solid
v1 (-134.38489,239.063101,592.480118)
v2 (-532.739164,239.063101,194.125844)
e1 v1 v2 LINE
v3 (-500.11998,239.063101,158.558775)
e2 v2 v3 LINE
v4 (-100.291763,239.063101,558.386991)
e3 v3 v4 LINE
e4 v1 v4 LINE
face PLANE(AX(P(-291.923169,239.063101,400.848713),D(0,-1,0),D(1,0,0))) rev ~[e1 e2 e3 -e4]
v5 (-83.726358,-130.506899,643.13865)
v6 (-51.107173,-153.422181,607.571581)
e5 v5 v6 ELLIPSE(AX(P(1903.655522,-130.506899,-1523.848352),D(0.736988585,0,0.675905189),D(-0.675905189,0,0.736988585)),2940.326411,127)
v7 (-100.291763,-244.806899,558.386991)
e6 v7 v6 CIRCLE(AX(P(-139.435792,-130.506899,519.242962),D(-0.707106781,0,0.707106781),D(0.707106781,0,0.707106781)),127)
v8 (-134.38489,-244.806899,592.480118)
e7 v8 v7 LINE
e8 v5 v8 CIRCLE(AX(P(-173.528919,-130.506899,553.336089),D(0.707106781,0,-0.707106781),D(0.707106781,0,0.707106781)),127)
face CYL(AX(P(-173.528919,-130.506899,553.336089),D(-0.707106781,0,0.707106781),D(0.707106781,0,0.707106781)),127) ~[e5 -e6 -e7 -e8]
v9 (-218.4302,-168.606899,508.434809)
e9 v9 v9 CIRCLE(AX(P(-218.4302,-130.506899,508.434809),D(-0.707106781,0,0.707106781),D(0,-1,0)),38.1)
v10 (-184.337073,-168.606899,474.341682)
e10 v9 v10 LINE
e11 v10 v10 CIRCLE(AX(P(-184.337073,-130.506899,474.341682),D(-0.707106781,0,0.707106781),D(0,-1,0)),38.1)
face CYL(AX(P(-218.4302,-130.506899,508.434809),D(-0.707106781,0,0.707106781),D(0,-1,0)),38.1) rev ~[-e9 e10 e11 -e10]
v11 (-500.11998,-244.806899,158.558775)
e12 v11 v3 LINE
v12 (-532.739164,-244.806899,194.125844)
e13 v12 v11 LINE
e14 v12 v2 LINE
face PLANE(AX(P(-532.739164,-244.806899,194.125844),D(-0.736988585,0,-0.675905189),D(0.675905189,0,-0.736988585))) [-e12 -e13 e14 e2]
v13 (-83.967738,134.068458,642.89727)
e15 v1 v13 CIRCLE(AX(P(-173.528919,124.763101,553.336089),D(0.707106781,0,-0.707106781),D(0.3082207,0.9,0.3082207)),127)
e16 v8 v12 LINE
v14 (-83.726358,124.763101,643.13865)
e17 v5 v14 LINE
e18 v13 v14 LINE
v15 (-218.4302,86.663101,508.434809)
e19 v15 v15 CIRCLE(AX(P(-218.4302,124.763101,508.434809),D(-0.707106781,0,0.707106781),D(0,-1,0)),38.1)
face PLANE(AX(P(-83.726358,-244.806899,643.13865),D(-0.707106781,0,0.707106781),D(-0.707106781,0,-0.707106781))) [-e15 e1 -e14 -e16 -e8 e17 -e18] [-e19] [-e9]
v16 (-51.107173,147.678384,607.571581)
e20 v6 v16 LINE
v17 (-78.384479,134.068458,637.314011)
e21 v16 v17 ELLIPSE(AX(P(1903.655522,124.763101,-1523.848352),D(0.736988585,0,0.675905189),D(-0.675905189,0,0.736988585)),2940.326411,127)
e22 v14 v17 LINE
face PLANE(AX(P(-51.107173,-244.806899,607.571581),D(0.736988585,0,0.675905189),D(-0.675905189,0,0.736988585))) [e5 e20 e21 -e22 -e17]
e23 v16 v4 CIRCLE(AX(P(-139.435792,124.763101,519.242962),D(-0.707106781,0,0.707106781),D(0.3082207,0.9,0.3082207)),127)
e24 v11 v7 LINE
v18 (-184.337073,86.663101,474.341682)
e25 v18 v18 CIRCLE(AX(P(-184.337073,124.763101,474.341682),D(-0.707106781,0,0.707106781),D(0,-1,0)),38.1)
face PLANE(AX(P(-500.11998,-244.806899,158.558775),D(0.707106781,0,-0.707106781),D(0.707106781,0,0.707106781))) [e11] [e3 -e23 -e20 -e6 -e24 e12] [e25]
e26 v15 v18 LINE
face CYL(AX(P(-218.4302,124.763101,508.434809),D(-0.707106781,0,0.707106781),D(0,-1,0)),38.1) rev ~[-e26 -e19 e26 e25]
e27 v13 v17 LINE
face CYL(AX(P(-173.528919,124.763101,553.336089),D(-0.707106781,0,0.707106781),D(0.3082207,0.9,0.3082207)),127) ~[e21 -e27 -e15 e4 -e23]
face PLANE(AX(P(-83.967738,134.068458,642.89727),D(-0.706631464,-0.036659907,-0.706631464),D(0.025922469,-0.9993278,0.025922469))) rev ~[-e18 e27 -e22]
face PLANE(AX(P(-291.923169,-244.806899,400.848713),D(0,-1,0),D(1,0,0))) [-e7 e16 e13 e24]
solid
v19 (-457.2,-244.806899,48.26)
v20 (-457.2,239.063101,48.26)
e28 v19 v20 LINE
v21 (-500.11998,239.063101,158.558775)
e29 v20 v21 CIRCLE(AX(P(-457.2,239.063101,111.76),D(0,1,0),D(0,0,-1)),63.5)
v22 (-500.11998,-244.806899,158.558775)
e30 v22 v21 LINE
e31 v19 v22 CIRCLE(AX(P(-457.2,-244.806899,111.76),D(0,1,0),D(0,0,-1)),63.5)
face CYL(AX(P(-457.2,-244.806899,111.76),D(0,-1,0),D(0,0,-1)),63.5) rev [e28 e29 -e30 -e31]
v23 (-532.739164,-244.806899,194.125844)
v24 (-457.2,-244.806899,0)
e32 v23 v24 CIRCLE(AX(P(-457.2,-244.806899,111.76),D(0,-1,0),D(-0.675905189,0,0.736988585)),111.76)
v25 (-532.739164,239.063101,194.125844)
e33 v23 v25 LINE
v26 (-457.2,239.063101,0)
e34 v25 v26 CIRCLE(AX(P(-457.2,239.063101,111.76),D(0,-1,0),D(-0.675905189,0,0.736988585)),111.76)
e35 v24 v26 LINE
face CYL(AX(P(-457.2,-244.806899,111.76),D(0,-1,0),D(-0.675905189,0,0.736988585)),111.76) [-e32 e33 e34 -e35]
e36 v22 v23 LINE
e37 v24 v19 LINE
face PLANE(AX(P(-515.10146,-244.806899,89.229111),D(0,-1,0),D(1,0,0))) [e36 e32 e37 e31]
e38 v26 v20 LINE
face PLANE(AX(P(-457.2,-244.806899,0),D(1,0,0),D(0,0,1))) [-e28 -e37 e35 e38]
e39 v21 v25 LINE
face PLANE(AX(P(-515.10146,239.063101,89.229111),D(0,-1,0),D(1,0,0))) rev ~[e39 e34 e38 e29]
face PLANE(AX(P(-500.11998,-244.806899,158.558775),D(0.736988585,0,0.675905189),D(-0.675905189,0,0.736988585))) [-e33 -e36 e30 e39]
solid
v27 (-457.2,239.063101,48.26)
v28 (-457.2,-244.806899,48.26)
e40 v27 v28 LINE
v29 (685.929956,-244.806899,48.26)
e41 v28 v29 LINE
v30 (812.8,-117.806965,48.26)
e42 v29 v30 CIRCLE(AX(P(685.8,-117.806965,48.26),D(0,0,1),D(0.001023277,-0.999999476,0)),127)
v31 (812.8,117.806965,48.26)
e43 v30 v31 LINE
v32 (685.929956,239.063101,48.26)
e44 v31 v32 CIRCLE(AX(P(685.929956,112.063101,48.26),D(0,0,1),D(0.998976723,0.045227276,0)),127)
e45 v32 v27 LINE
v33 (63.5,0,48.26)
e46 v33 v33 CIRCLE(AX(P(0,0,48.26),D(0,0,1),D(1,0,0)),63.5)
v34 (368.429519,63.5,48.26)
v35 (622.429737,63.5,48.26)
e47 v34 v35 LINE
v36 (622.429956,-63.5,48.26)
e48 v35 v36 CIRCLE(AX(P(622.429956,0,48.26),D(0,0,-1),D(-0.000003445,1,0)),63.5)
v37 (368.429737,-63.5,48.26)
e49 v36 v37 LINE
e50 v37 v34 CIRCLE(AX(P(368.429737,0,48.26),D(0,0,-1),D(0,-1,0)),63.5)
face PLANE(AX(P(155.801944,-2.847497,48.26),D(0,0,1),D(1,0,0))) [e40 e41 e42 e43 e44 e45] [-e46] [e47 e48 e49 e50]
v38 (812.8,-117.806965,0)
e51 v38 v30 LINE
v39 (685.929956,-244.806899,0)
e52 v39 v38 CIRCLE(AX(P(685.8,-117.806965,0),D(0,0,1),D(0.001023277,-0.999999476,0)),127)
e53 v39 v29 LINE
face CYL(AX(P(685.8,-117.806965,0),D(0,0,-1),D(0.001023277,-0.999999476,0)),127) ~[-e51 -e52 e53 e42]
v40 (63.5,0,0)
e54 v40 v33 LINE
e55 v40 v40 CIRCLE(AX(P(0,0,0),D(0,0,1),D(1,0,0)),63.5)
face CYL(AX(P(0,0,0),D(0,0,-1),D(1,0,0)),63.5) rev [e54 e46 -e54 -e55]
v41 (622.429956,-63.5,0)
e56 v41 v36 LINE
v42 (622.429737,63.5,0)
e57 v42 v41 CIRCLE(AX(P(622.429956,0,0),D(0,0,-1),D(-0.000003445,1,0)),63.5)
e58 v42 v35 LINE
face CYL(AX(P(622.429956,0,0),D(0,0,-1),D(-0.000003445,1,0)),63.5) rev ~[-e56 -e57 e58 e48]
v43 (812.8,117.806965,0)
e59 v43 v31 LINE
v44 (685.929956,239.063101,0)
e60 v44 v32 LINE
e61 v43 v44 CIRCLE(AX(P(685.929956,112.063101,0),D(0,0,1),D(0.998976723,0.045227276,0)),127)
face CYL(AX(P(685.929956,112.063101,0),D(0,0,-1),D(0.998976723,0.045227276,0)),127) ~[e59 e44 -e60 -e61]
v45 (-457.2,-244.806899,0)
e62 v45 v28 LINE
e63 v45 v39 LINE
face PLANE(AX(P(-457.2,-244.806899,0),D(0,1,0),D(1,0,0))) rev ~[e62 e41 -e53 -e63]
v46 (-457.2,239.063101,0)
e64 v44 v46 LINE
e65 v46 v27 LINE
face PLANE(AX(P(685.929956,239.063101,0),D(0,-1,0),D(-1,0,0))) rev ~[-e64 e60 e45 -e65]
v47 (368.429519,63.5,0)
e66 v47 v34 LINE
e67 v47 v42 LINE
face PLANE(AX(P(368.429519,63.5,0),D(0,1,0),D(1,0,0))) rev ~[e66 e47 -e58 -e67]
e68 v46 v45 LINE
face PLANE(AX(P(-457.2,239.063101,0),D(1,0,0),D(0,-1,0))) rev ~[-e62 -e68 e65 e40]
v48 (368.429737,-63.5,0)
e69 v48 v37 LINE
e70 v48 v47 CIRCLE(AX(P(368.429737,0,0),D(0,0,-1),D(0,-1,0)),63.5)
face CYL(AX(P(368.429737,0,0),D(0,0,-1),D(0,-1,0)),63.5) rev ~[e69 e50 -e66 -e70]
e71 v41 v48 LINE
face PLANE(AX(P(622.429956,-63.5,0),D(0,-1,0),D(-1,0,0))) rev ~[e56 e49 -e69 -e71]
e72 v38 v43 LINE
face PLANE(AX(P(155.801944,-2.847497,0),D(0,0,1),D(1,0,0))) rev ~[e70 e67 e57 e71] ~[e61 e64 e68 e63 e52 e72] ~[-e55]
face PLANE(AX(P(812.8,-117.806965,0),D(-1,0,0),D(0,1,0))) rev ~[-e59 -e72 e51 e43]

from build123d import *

# Parameters (mm, degrees)
F0_R     = 63.5
F1_DEPTH = 48.26
F3_DEPTH = 483.87
F6_DEPTH = 483.87
F7_R     = 38.1
F8_DEPTH = 48.26


# Not quite as in the source:
# - a feature of the source that left no trace in its solid (it failed there, or was rolled back) is left out


with BuildPart() as f1:
    # F0 (on Top) → F1 (new body)
    with BuildSketch(Plane.XY):
        with BuildLine():
            Line((685.9299561556, 239.0631011906), (-457.2, 239.0631011906))
            Line((-457.2, 239.0631011906), (-457.2, -244.8068988094))
            Line((-457.2, -244.8068988094), (685.9299561556, -244.8068988094))
            ThreePointArc((685.9299561556, -244.8068988094), (775.6484959021, -207.5635683113), (812.8, -117.8069653))
            Line((812.8, -117.8069653), (812.8, 117.8069653))
            ThreePointArc((812.8, 117.8069653), (773.6782588688, 203.8739685808), (685.9299561556, 239.0631011906))
        make_face()
        Circle(F0_R, mode=Mode.SUBTRACT)
        with BuildLine():
            ThreePointArc((368.4297373828, -63.5), (304.9297373818, -0.0001093866), (368.4295186092, 63.5))
            Line((368.4295186092, 63.5), (622.4297373818, 63.5))
            ThreePointArc((622.4297373818, 63.5), (685.9299561555, 0.000109387), (622.4299561555, -63.5))
            Line((622.4299561555, -63.5), (368.4297373828, -63.5))
        make_face(mode=Mode.SUBTRACT)
    extrude(amount=F1_DEPTH)


with BuildPart() as f3:
    # F2 (on face) → F3 (new body)
    with BuildSketch(Plane.XZ.offset(244.8068988094)):
        with BuildLine():
            Line((-500.1199795269, 158.55877517), (-532.7391639674, 194.1258442992))
            ThreePointArc((-532.7391639674, 194.1258442992), (-561.3525428371, 71.2316713821), (-457.2, 0))
            Line((-457.2, 0), (-457.2, 48.26))
            ThreePointArc((-457.2, 48.26), (-516.3775811575, 88.732540558), (-500.1199795269, 158.55877517))
        make_face()
    extrude(amount=-F3_DEPTH)


with BuildPart() as f6:
    # F5 (on face) → F6 (new body)
    with BuildSketch(Plane.XZ.offset(244.8068988094)):
        Polygon((-83.7263579139, 643.1386503526), (-532.7391639674, 194.1258442992), (-500.1199795269, 158.55877517), (-51.1071734735, 607.5715812234), align=None)
    extrude(amount=-F6_DEPTH)

    # F7 (on face) → F8 (cut)
    with BuildSketch(Plane(origin=(-363.4325041333, 0, 363.4325041333), x_dir=(0, -1, 0), z_dir=(-0.7071067812, 0, 0.7071067812))):
        with BuildLine():
            Line((244.8068988094, 395.5642254625), (130.5068988094, 395.5642254625))
            ThreePointArc((130.5068988094, 395.5642254625), (197.9551452431, 376.1733981804), (244.8068988094, 323.9222420455))
            Line((244.8068988094, 323.9222420455), (244.8068988094, 395.5642254625))
        make_face()
        with Locations((-124.7631011906, 205.0642254625)):
            Circle(F7_R)
        with Locations((130.5068988094, 205.0642254625)):
            Circle(F7_R)
        with BuildLine():
            Line((-134.0684582131, 395.2228624783), (-124.7631011906, 395.5642254625))
            ThreePointArc((-124.7631011906, 395.5642254625), (-129.4189093375, 395.4788560238), (-134.0684582131, 395.2228624783))
        make_face()
        with BuildLine():
            ThreePointArc((-134.0684582131, 395.2228624783), (-129.4189093375, 395.4788560238), (-124.7631011906, 395.5642254625))
            Line((-124.7631011906, 395.5642254625), (-239.0631011906, 395.5642254625))
            Line((-239.0631011906, 395.5642254625), (-239.0631011906, 323.9222420455))
            ThreePointArc((-239.0631011906, 323.9222420455), (-196.110951121, 373.6284168424), (-134.0684582131, 395.2228624783))
        make_face()
    extrude(amount=-F8_DEPTH, mode=Mode.SUBTRACT)


solid = Compound([f1.part, f3.part, f6.part])
